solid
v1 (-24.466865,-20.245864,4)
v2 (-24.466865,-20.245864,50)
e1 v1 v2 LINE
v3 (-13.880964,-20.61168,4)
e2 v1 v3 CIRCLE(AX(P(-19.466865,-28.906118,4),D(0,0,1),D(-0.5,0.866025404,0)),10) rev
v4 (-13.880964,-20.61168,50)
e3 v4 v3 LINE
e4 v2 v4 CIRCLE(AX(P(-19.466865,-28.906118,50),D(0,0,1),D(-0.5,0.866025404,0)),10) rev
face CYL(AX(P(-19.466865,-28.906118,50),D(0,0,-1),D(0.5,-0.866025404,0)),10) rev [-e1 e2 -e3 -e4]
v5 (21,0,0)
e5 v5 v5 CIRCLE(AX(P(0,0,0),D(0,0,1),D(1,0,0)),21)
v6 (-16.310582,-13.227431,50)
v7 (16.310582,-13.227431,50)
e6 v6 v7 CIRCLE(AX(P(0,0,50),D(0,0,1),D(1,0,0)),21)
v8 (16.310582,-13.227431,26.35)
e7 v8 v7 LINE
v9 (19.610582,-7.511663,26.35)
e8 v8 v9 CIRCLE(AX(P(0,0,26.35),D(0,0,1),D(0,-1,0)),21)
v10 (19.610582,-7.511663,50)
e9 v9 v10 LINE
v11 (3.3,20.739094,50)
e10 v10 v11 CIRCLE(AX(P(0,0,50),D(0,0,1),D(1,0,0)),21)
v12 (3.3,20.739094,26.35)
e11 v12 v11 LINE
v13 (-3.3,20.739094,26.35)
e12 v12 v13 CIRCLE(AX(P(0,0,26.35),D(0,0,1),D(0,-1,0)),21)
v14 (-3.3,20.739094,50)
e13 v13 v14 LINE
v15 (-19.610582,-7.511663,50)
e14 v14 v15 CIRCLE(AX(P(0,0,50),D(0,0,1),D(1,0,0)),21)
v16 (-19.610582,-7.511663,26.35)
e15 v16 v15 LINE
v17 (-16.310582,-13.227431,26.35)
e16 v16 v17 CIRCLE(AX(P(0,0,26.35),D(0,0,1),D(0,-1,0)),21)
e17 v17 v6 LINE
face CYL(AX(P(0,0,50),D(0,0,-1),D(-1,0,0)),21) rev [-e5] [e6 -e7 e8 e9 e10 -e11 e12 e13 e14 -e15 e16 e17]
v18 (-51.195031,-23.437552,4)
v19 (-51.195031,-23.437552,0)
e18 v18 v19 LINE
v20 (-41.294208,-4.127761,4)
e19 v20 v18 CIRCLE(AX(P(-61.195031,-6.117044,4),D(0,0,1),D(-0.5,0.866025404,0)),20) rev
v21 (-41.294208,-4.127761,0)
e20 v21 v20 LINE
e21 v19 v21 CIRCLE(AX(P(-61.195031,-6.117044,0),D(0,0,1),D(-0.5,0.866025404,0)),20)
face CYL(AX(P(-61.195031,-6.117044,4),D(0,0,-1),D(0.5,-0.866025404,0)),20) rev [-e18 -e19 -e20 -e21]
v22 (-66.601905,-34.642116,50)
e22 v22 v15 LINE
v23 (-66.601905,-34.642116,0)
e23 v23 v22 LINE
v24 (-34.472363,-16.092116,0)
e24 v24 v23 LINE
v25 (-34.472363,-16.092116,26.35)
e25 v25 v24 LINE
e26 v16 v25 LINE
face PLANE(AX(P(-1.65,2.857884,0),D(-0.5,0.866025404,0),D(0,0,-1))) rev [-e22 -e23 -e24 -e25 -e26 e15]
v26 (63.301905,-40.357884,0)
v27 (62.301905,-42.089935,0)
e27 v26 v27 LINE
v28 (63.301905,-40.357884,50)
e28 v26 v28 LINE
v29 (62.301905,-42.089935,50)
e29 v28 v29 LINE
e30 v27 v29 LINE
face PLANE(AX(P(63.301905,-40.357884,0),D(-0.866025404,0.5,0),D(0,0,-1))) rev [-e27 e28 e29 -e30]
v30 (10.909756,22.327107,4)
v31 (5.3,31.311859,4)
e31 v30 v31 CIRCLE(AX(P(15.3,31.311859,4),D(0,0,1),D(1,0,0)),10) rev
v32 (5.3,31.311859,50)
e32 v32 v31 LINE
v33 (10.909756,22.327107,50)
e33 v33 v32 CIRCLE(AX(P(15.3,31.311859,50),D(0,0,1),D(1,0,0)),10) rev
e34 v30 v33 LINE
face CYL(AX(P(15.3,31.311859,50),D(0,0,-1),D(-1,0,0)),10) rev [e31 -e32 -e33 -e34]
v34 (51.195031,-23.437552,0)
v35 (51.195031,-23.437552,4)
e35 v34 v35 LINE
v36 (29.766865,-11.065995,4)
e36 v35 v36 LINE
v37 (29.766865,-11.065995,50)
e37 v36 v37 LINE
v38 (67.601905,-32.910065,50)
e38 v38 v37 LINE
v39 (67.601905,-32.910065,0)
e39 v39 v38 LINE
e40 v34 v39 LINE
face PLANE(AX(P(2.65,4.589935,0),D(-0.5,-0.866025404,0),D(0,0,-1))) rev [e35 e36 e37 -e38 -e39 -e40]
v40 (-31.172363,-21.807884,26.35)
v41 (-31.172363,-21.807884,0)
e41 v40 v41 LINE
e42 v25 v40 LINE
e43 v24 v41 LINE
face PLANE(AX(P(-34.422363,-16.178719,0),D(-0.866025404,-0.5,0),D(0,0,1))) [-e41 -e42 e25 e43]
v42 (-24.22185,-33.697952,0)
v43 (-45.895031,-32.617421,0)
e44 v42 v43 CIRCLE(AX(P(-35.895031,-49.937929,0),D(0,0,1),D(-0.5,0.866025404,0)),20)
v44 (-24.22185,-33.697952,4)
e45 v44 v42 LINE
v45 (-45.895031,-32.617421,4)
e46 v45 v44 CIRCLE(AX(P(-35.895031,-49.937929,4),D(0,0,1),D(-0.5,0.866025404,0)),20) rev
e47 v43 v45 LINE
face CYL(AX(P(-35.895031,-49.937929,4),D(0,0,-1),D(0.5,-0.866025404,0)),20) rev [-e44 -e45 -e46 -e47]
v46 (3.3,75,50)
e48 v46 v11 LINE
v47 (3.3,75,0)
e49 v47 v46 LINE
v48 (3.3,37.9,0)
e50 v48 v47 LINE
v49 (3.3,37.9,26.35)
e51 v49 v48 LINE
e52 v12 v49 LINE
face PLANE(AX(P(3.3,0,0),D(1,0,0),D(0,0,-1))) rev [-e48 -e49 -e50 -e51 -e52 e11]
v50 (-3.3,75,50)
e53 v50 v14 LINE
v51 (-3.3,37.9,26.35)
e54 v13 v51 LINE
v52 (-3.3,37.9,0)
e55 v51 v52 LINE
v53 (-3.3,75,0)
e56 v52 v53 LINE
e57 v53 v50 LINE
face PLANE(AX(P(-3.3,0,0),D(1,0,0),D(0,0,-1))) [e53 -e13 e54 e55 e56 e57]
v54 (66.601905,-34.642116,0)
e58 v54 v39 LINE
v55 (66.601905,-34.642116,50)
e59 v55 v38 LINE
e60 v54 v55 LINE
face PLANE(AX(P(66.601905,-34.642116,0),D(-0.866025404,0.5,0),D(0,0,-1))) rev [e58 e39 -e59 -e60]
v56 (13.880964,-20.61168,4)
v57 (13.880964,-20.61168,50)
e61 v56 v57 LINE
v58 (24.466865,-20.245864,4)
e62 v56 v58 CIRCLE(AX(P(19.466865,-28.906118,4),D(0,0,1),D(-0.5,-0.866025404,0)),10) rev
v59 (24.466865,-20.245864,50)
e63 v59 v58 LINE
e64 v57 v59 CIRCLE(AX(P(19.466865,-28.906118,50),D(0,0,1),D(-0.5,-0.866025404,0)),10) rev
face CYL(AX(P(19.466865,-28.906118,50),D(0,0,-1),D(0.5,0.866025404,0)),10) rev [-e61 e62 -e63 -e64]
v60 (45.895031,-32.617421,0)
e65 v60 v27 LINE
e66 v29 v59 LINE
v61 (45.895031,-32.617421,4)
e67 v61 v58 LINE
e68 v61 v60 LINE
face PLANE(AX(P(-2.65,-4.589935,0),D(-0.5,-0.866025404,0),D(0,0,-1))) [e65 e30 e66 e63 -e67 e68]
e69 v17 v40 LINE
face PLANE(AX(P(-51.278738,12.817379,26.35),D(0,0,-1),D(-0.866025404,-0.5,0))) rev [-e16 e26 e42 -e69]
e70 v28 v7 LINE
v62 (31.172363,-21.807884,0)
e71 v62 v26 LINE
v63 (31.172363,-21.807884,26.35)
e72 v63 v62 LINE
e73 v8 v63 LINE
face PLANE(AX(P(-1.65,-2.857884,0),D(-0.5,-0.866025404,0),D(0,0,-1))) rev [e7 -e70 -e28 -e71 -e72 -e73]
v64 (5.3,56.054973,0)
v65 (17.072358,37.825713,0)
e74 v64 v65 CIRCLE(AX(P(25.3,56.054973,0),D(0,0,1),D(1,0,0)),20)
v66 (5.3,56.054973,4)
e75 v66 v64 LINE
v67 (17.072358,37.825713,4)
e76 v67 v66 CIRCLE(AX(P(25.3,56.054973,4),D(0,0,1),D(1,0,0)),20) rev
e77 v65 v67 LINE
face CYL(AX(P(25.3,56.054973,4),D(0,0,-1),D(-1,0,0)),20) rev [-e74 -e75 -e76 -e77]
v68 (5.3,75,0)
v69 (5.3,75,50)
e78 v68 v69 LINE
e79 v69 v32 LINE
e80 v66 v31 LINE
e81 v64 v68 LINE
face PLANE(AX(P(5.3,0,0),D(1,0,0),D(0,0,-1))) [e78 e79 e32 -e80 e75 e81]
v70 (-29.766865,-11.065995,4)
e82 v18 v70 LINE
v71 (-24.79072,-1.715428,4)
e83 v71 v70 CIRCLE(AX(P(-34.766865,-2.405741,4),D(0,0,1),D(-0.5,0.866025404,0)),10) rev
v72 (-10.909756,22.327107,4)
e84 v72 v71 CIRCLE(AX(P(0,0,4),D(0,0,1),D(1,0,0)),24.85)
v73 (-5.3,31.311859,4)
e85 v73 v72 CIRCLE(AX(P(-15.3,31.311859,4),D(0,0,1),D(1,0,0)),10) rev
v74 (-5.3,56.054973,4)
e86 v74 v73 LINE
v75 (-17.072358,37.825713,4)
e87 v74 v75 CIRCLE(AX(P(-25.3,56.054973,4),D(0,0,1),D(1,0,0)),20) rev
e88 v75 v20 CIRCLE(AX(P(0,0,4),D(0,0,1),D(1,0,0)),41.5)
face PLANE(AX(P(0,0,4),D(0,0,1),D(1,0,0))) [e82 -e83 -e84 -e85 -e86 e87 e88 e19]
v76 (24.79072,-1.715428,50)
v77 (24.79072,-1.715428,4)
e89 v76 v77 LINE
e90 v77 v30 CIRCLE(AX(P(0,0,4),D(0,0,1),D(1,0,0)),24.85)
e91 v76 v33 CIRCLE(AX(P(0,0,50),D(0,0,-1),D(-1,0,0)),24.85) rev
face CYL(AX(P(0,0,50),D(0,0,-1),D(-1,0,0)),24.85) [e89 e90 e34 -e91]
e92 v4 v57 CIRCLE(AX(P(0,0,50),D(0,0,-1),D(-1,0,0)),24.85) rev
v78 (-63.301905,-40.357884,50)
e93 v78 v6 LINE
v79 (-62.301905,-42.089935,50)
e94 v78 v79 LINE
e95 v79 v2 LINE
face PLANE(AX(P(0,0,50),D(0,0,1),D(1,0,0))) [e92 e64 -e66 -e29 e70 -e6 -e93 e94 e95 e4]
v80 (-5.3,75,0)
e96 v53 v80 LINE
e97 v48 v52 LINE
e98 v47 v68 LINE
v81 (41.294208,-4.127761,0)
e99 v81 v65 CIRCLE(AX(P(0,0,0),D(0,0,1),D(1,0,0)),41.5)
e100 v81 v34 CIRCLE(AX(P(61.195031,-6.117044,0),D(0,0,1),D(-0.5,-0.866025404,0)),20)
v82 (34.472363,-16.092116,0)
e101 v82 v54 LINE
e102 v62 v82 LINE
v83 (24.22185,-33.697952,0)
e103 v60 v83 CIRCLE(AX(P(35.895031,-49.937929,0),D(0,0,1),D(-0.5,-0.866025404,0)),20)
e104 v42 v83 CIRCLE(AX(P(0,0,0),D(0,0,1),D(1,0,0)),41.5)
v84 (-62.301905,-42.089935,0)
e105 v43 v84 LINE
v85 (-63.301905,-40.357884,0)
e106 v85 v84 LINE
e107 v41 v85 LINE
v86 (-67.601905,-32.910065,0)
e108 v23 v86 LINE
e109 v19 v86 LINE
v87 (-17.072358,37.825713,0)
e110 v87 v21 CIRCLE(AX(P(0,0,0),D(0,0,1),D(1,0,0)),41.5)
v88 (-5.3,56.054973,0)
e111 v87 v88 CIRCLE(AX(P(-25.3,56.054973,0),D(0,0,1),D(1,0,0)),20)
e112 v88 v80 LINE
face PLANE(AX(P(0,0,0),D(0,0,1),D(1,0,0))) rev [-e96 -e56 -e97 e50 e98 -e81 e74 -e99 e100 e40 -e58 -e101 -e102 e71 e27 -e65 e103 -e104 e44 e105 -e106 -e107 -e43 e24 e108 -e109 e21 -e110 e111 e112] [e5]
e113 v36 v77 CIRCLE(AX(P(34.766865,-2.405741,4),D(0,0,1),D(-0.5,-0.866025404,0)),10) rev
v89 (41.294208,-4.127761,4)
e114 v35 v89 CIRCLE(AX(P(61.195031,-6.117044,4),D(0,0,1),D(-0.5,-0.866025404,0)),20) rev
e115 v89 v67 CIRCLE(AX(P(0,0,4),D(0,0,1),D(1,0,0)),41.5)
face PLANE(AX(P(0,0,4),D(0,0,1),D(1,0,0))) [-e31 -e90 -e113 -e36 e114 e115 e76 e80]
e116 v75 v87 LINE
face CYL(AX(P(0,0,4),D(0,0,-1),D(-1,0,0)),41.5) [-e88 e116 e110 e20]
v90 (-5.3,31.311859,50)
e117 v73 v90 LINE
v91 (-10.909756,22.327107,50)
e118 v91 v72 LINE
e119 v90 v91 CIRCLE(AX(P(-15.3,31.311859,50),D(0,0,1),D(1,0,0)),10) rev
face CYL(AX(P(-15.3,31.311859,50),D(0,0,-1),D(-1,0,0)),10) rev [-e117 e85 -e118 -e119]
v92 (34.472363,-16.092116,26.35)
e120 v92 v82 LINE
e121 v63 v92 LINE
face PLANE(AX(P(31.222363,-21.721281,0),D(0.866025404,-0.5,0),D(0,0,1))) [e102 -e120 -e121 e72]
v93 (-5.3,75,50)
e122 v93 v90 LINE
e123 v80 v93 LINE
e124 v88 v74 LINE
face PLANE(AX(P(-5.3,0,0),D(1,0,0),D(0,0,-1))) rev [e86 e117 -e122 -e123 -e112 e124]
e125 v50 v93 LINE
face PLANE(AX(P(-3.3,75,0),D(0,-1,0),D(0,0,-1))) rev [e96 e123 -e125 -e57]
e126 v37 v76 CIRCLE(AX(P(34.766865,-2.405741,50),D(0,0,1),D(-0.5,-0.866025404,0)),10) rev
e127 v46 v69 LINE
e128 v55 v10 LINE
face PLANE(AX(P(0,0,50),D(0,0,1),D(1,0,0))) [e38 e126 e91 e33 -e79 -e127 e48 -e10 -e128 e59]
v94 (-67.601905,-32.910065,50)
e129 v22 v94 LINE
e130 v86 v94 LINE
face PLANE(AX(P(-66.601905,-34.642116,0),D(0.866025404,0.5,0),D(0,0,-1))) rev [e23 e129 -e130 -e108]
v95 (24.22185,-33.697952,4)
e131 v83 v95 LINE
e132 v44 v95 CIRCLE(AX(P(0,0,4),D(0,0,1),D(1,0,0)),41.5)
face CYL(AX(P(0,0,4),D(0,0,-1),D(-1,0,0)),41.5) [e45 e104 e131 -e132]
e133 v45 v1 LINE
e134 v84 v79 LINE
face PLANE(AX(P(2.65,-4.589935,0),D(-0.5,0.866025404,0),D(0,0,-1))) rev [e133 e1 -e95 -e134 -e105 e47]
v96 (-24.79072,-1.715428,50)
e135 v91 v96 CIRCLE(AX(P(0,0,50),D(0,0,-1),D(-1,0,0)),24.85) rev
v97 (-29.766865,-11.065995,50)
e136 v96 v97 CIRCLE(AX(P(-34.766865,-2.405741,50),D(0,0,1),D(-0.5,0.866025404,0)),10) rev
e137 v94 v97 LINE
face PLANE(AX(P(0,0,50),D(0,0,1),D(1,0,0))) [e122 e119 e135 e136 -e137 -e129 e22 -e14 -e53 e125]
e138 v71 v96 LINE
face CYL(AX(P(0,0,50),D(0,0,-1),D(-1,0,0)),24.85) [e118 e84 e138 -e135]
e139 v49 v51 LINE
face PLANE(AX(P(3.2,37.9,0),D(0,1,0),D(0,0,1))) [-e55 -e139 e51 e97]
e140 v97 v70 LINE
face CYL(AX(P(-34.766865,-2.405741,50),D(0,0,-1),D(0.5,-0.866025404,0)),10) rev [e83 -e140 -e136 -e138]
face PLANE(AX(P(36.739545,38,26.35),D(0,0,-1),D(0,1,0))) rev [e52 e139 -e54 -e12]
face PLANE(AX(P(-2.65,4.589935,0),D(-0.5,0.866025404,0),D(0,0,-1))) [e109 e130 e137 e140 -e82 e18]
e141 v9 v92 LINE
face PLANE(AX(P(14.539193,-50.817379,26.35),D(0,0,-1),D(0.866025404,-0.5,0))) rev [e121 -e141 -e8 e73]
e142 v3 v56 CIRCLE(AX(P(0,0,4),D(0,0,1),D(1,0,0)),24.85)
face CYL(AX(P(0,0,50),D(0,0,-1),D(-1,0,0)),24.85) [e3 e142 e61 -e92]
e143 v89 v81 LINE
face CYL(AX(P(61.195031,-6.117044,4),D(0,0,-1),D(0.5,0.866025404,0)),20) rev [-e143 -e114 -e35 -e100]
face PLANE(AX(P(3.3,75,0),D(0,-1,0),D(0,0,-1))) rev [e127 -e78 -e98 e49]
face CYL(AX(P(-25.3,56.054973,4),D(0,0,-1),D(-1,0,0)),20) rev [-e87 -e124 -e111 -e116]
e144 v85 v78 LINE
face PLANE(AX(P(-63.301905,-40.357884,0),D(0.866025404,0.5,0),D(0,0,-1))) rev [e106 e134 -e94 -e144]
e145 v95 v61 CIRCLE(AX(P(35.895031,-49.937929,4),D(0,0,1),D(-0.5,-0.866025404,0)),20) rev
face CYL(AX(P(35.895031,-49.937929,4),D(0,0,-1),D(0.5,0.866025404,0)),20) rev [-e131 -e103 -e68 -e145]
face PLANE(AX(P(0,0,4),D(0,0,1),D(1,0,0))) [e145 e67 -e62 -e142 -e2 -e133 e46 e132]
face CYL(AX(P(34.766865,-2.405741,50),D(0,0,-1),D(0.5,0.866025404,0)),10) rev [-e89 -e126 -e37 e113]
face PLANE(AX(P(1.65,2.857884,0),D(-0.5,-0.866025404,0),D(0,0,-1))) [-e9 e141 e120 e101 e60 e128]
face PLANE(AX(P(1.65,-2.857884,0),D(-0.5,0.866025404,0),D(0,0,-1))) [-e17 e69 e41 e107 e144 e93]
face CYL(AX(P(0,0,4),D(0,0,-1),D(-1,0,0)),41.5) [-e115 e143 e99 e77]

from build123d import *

# Parameters (mm, degrees)
SKETCH1_R                       = 20.75
BOSS_EXTRUDE1_DEPTH             = 50
BOSS_EXTRUDE2_DEPTH             = 3.2
THICKEN1_OUTLINE_R              = 24.85
THICKEN1_OUTLINE_R_2            = 20.85
THICKEN1_DEPTH                  = 50
THICKEN2_OUTLINE_W              = 2
THICKEN2_OUTLINE_H              = 37
THICKEN2_DEPTH                  = 50
THICKEN2_START                  = 26.35
THICKEN2_2_DEPTH                = 23.65
THICKEN3_OUTLINE_W              = 2
THICKEN3_OUTLINE_H              = 37
THICKEN3_DEPTH                  = 50
THICKEN3_START                  = 26.35
THICKEN3_2_DEPTH                = 23.65
BOSS_EXTRUDE4_REACH             = 95.501
SKETCH4_W                       = 26.35
SKETCH4_H                       = 17.15
BOSS_EXTRUDE4_DIRECTION_2_REACH = 95.501
FILLET1_R                       = 10
SKETCH3_R                       = 41.5
BOSS_EXTRUDE3_DEPTH             = 4
FILLET2_R                       = 20
CIRPATTERN4_COUNT               = 3
MOVE_FACE3_BY                   = 0.25
MOVE_FACE4_BY                   = 0.1
MOVE_FACE4_2_BY                 = 0.1
MOVE_FACE4_3_BY                 = 0.1
MOVE_START                      = 26.35
MOVE_FACE5_OUTLINE_W            = 6.6
MOVE_FACE5_OUTLINE_H            = 20.75
MOVE_FACE5_DEPTH                = 23.65
CIRPATTERN1_COUNT               = 3


with BuildPart() as part:
    # Sketch1 → Boss-Extrude1 (new body)
    with BuildSketch(Plane.XY):
        Circle(SKETCH1_R)
    extrude(amount=BOSS_EXTRUDE1_DEPTH)

    # Move Face3: a curved face moved outward by 0.25
    add(Solid.thicken(part.faces().sort_by_distance((-20.75, 0, 25))[0], MOVE_FACE3_BY))


with BuildPart() as body_2:
    # Sketch2 → Boss-Extrude2 (new, symmetric)
    with BuildSketch(Plane(origin=(0, 0, 0), x_dir=(0, 0, -1), z_dir=(1, 0, 0))):
        Polygon((-26.35, 20.75), (-26.35, 38), (0, 38), (0, 75), (-50, 75), (-50, 20.75), align=None)
    extrude(amount=BOSS_EXTRUDE2_DEPTH, both=True)

    # Move Face4: a face moved outward by 0.1
    extrude(body_2.faces().sort_by_distance((0, 38, 13.175))[0], amount=MOVE_FACE4_BY, dir=(0, -1, 0))

    # Move Face4 2: a face moved outward by 0.1
    extrude(body_2.faces().sort_by_distance((-3.2, 51.599129054, 27.380423031))[0], amount=MOVE_FACE4_2_BY, dir=(-1, 0, 0))

    # Move Face4 3: a face moved outward by 0.1
    extrude(body_2.faces().sort_by_distance((3.2, 51.599129054, 27.380423031))[0], amount=MOVE_FACE4_3_BY, dir=(1, 0, 0))

    # Move Face5: read off the stored shape, not the designer's step
    # Move Face5 outline → Move Face5 (add)
    with BuildSketch(Plane.XY.offset(MOVE_START)):
        with Locations((0, 10.375)):
            Rectangle(MOVE_FACE5_OUTLINE_W, MOVE_FACE5_OUTLINE_H)
    extrude(amount=MOVE_FACE5_DEPTH)


with BuildPart() as body_3:
    # Thicken1: read off the stored shape, not the designer's step
    # Thicken1 outline → Thicken1 (new body)
    with BuildSketch(Plane.XY):
        Circle(THICKEN1_OUTLINE_R)
        Circle(THICKEN1_OUTLINE_R_2, mode=Mode.SUBTRACT)
    extrude(amount=THICKEN1_DEPTH)

    # Thicken2: read off the stored shape, not the designer's step
    # Thicken2 outline → Thicken2 (add)
    with BuildSketch(Plane.XY):
        with Locations((-4.3, 56.5)):
            Rectangle(THICKEN2_OUTLINE_W, THICKEN2_OUTLINE_H)
    extrude(amount=THICKEN2_DEPTH)

    # Thicken2 2 outline → Thicken2 2 (add)
    with BuildSketch(Plane.XY.offset(THICKEN2_START)):
        with BuildLine():
            Line((-5.3, 38), (-5.3, 24.27823099))
            ThreePointArc((-5.3, 24.27823099), (-4.303593806, 24.474508787), (-3.3, 24.629910678))
            Line((-3.3, 24.629910678), (-3.3, 38))
            Line((-3.3, 38), (-5.3, 38))
        make_face()
    extrude(amount=THICKEN2_2_DEPTH)

    # Thicken3: read off the stored shape, not the designer's step
    # Thicken3 outline → Thicken3 (add)
    with BuildSketch(Plane.XY):
        with Locations((4.3, 56.5)):
            Rectangle(THICKEN3_OUTLINE_W, THICKEN3_OUTLINE_H)
    extrude(amount=THICKEN3_DEPTH)

    # Thicken3 2 outline → Thicken3 2 (add)
    with BuildSketch(Plane.XY.offset(THICKEN3_START)):
        with BuildLine():
            Line((5.3, 38), (3.3, 38))
            Line((3.3, 38), (3.3, 24.629910678))
            ThreePointArc((3.3, 24.629910678), (4.303593806, 24.474508787), (5.3, 24.27823099))
            Line((5.3, 24.27823099), (5.3, 38))
        make_face()
    extrude(amount=THICKEN3_2_DEPTH)

    # Boss-Extrude4: up to this face of the body (flat: up to its plane)
    boss_extrude4_end = Plane(body_3.part.faces().sort_by_distance((5.3, 52.715205781, 26.966203656))[0])
    # Sketch4 → Boss-Extrude4 (add, up to the picked face)
    with BuildSketch(Plane(origin=(0, 0, 0), x_dir=(0, 0, -1), z_dir=(1, 0, 0)), mode=Mode.PRIVATE) as boss_extrude4_sk1:
        with Locations((-13.175, 29.425)):
            Rectangle(SKETCH4_W, SKETCH4_H)
    boss_extrude4_tool1 = split(extrude(boss_extrude4_sk1.sketch, amount=BOSS_EXTRUDE4_REACH, mode=Mode.PRIVATE), bisect_by=boss_extrude4_end, keep=Keep.BOTH, mode=Mode.PRIVATE)
    add(boss_extrude4_tool1.solids().sort_by(Axis((0, 29.425, 13.175), (1, 0, 0)))[0])

    # Boss-Extrude4 direction 2: up to this face of the body (flat: up to its plane)
    boss_extrude4_direction_2_end = Plane(body_3.part.faces().sort_by_distance((-5.3, 52.715205781, 26.966203656))[0])
    # Sketch4 → Boss-Extrude4 direction 2 (add, up to the picked face)
    with BuildSketch(Plane(origin=(0, 0, 0), x_dir=(0, 0, -1), z_dir=(1, 0, 0)), mode=Mode.PRIVATE) as boss_extrude4_direction_2_sk1:
        with Locations((-13.175, 29.425)):
            Rectangle(SKETCH4_W, SKETCH4_H)
    boss_extrude4_direction_2_tool1 = split(extrude(boss_extrude4_direction_2_sk1.sketch, amount=-BOSS_EXTRUDE4_DIRECTION_2_REACH, mode=Mode.PRIVATE), bisect_by=boss_extrude4_direction_2_end, keep=Keep.BOTH, mode=Mode.PRIVATE)
    add(boss_extrude4_direction_2_tool1.solids().sort_by(Axis((0, 29.425, 13.175), (-1, 0, 0)))[0])

    # Fillet1
    fillet1_edges = [body_3.edges().sort_by_distance(p)[0] for p in [
        (-5.3, 24.27823099, 13.175),
        (5.3, 24.27823099, 13.175),
    ]]
    fillet(fillet1_edges, radius=FILLET1_R)

    # Sketch3 → Boss-Extrude3 (add)
    with BuildSketch(Plane.XY):
        Circle(SKETCH3_R)
    extrude(amount=BOSS_EXTRUDE3_DEPTH)

    # Fillet2
    fillet2_edges = [body_3.edges().sort_by_distance(p)[0] for p in [
        (-5.3, 41.160174927, 2),
        (5.3, 41.160174927, 2),
    ]]
    fillet(fillet2_edges, radius=FILLET2_R)


with BuildPart() as cirpattern4_1:
    # CirPattern4: pattern copy
    add(body_3.part.rotate(Axis((0, 0, 0), (0, 0, 1)), 1 * 360 / CIRPATTERN4_COUNT))


with BuildPart() as cirpattern4_2:
    # CirPattern4: pattern copy
    add(body_3.part.rotate(Axis((0, 0, 0), (0, 0, 1)), 2 * 360 / CIRPATTERN4_COUNT))

    # Combine2: read off the stored shape, not the designer's step
    # Combine2: union CirPattern4_1, body 3
    add(cirpattern4_1.part)
    add(body_3.part)


with BuildPart() as cirpattern1_1:
    # CirPattern1: pattern copy
    add(body_2.part.rotate(Axis((0, 0, 0), (0, 0, 1)), 1 * 360 / CIRPATTERN1_COUNT))


with BuildPart() as cirpattern1_2:
    # CirPattern1: pattern copy
    add(body_2.part.rotate(Axis((0, 0, 0), (0, 0, 1)), 2 * 360 / CIRPATTERN1_COUNT))


with BuildPart() as cirpattern4_2_1:
    add(cirpattern4_2.part)

    # Combine3: read off the stored shape, not the designer's step
    # Combine3: cut CirPattern1_2, CirPattern1_1, body 2, part
    add(cirpattern1_2.part, mode=Mode.SUBTRACT)
    add(cirpattern1_1.part, mode=Mode.SUBTRACT)
    add(body_2.part, mode=Mode.SUBTRACT)
    add(part.part, mode=Mode.SUBTRACT)


solid = cirpattern4_2_1.part
